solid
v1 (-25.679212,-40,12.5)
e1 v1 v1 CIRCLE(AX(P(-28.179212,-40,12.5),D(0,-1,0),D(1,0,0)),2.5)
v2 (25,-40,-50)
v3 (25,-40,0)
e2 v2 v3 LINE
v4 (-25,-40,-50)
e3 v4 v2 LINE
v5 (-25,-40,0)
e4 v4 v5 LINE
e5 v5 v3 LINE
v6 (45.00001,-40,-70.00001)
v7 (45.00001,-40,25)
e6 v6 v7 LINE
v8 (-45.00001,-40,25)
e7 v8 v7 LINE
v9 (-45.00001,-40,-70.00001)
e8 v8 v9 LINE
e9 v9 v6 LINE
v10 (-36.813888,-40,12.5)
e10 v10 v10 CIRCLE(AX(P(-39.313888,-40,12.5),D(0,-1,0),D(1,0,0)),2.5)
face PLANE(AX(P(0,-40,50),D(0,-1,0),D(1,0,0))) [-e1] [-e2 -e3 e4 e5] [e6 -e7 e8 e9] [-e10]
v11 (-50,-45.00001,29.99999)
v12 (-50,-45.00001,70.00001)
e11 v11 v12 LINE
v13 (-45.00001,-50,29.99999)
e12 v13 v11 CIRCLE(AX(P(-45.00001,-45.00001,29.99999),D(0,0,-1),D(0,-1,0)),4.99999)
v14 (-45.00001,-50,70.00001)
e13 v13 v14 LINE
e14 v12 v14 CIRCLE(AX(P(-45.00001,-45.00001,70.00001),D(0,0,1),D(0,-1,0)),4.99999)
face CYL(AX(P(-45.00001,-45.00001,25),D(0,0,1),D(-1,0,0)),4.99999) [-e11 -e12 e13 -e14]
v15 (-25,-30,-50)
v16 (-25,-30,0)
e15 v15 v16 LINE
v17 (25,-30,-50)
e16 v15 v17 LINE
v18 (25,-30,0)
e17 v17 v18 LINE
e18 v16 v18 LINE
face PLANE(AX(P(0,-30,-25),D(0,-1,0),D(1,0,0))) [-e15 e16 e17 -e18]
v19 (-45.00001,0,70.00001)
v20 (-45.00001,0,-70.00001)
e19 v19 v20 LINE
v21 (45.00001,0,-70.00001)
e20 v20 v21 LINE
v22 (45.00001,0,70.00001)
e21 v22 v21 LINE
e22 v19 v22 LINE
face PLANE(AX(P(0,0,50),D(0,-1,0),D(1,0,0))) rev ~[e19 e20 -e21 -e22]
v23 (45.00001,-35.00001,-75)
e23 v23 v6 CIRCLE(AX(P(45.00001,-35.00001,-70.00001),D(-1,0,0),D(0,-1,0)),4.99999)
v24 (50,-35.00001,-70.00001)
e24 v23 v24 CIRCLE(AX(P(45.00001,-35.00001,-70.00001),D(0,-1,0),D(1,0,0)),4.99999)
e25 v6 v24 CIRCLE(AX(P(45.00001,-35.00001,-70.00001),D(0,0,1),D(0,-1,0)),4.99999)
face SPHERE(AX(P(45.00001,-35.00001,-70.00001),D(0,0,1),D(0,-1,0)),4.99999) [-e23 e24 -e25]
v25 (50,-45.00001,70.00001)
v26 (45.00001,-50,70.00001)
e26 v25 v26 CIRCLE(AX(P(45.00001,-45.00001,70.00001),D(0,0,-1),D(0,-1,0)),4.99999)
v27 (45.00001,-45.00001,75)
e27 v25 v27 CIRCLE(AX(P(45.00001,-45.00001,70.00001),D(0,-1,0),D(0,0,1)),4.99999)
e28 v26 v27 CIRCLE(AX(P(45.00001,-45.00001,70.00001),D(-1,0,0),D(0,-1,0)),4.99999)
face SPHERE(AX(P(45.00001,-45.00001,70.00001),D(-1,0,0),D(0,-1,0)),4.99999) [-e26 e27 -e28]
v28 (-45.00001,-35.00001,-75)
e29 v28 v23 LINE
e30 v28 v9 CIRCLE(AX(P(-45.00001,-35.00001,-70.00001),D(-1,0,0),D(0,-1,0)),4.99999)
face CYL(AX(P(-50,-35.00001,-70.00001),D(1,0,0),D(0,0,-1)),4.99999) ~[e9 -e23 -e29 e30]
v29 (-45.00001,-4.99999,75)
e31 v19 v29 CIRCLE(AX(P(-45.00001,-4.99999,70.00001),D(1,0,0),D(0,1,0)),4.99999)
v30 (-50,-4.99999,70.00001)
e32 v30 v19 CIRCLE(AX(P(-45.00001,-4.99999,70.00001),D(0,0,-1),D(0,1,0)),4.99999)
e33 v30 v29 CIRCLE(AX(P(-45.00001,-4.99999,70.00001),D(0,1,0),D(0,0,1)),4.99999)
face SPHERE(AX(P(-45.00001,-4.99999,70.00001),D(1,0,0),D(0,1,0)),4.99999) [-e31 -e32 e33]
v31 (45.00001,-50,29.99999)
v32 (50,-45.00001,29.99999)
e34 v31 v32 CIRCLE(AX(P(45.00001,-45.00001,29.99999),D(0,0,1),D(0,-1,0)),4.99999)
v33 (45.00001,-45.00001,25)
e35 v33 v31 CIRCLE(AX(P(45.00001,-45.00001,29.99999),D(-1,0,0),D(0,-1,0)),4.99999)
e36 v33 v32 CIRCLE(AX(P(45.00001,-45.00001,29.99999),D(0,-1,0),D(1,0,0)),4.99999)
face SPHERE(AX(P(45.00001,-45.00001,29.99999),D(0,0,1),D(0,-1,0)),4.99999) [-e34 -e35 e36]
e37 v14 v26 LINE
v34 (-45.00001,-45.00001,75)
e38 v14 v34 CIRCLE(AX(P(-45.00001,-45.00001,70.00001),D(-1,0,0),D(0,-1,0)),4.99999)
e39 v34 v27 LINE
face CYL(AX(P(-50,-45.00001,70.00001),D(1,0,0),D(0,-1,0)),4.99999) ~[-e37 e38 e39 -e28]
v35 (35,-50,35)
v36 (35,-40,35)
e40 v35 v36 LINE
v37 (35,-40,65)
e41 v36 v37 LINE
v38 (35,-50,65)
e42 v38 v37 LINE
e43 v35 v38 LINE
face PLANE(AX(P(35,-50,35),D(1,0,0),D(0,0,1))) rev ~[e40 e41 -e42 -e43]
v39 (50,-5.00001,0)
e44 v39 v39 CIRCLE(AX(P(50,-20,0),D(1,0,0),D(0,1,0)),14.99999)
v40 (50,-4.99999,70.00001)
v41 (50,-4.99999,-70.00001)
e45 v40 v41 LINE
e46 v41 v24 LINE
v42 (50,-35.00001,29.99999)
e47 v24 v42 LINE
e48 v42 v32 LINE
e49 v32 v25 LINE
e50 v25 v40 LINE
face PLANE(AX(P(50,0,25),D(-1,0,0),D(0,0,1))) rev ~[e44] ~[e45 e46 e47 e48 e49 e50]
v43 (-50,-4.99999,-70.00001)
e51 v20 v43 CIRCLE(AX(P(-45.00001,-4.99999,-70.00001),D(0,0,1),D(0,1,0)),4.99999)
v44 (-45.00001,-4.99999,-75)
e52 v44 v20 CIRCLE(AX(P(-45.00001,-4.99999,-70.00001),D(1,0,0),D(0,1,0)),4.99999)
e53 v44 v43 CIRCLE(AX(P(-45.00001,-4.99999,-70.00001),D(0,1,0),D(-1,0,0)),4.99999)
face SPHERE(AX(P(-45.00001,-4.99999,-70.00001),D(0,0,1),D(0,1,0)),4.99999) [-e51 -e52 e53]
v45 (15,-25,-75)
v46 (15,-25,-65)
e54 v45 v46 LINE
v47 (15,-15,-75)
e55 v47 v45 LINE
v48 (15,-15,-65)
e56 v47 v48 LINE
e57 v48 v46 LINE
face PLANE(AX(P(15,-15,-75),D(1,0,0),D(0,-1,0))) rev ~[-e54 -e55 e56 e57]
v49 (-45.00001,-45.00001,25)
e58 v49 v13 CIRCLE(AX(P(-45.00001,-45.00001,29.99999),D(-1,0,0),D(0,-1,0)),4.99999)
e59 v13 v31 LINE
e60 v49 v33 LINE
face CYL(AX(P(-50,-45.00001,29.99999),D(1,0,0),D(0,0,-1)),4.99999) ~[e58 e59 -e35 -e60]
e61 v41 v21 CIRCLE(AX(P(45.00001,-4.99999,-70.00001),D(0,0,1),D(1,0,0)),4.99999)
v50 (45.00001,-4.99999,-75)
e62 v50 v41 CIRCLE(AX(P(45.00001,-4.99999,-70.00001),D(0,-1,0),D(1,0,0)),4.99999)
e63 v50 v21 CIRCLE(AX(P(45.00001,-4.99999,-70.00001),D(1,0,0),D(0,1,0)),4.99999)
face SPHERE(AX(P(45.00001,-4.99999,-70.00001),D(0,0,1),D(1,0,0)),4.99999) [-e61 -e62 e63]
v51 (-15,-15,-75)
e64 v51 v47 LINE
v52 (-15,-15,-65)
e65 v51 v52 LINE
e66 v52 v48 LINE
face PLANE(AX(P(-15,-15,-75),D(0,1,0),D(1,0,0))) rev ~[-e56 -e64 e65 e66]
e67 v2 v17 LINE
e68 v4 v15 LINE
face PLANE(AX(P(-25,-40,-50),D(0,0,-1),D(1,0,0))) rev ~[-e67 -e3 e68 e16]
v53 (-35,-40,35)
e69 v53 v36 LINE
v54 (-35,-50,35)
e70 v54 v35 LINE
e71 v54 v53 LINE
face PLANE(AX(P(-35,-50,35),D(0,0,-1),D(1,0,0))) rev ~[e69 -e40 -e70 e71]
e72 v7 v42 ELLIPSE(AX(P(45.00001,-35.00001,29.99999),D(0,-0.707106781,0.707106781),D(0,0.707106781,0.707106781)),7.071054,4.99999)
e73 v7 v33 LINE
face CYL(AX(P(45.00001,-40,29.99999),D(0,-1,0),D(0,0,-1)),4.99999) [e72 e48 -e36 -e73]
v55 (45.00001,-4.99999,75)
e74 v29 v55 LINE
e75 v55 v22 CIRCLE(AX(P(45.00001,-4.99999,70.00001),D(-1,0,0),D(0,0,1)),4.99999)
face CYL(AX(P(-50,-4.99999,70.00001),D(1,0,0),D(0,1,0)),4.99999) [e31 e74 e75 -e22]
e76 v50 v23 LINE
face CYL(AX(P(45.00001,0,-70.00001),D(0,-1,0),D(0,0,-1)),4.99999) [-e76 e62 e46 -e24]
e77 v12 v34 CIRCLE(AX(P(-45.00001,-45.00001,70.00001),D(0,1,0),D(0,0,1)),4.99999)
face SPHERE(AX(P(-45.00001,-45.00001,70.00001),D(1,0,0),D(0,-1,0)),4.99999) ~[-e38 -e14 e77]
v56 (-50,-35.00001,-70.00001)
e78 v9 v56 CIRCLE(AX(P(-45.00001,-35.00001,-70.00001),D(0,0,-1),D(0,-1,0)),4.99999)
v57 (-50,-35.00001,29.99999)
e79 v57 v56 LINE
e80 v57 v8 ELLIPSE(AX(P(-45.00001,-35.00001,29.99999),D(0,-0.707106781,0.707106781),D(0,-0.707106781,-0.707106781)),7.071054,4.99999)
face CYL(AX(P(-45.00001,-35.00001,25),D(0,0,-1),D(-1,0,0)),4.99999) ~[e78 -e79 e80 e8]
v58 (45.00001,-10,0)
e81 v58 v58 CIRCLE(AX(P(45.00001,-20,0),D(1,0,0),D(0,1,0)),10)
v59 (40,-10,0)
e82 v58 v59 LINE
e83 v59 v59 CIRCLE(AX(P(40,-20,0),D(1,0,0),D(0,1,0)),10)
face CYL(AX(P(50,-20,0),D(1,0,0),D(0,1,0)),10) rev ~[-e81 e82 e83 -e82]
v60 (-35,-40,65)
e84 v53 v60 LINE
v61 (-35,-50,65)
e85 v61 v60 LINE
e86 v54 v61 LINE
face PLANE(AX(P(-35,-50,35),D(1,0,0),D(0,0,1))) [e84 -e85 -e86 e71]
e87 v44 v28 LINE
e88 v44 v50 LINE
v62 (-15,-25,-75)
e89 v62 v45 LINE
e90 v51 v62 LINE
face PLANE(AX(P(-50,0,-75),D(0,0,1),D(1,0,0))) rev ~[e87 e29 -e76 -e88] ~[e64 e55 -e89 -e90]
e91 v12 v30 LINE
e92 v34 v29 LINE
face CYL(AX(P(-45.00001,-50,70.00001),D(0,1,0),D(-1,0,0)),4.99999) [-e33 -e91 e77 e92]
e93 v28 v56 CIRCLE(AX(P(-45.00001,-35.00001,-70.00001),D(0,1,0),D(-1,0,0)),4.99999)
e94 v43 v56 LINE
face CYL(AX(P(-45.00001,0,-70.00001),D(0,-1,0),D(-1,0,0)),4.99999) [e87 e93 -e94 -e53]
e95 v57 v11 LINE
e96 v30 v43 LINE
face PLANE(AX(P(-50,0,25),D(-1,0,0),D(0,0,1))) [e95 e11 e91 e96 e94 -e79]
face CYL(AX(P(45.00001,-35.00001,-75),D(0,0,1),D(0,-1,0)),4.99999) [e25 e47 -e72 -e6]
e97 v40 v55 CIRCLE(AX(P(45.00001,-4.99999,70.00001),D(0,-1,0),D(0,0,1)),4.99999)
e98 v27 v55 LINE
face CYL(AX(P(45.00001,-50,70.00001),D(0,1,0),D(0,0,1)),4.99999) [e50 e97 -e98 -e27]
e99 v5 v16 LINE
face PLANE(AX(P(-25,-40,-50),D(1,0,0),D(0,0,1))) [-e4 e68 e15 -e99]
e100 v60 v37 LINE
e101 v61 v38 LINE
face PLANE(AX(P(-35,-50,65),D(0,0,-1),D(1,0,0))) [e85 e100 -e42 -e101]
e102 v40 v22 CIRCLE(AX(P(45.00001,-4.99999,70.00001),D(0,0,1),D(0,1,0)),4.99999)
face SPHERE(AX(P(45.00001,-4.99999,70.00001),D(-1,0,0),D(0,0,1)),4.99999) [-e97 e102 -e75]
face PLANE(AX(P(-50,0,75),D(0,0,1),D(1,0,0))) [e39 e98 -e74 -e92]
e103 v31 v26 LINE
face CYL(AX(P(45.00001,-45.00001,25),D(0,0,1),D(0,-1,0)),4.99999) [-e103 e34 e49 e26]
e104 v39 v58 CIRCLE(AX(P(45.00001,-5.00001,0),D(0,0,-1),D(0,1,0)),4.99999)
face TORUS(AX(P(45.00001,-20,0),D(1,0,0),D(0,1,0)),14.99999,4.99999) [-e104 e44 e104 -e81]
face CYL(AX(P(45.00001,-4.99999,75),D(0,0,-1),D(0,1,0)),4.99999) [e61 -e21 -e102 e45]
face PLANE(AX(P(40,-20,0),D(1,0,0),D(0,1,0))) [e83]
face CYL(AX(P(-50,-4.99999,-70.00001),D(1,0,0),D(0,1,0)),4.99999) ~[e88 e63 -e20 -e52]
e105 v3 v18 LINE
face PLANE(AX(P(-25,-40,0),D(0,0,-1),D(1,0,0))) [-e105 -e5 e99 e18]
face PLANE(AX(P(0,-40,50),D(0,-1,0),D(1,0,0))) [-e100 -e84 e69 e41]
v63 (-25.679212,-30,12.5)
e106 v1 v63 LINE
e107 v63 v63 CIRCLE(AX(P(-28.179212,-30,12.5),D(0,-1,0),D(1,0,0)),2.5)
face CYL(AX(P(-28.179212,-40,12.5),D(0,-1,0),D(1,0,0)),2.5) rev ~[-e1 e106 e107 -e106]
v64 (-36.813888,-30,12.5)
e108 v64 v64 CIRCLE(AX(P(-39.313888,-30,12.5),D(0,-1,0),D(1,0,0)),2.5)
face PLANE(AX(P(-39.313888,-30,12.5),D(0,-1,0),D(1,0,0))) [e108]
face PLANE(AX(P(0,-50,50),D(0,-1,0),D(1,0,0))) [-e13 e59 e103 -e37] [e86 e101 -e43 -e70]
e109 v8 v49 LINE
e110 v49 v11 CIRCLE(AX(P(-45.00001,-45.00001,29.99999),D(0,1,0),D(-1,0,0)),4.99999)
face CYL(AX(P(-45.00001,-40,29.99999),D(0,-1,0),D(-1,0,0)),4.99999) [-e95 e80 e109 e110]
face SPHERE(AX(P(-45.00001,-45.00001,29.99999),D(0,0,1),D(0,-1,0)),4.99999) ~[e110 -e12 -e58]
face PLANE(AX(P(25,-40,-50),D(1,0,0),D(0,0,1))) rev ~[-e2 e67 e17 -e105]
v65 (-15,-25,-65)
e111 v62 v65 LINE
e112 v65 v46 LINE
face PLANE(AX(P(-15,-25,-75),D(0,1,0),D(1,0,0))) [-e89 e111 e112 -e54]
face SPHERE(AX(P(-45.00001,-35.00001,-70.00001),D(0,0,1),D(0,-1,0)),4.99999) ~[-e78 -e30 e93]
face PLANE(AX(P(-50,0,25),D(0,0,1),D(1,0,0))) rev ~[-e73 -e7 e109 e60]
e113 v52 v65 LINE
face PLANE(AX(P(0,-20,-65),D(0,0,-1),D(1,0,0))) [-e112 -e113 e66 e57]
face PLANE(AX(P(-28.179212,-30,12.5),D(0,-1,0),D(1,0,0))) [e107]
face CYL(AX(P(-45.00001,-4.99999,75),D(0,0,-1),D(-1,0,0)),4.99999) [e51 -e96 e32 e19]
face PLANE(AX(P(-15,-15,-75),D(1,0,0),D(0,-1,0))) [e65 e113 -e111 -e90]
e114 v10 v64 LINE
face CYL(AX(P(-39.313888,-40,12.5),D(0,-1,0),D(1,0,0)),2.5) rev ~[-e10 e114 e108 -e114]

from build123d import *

# Parameters (mm, degrees)
F0_W      = 100
F0_H      = 50
F1_DEPTH  = 50
F3_DEPTH  = 10
F0_H_2    = 100
F4_DEPTH  = 40
F5_R      = 10
F6_DEPTH  = 10
F7_W      = 70
F7_H      = 30
F8_DEPTH  = 10
F9_W      = 30
F9_H      = 10
F10_DEPTH = 10
F11_W     = 50
F11_H     = 50
F12_DEPTH = 10
F13_R     = 4.99999
F14_R     = 2.5
F15_DEPTH = 10


# Not quite as in the source:
# - a fillet or chamfer is up to 0.001 mm smaller than in the source, because OpenCascade refuses the exact size


with BuildPart() as f1:
    # F0 (on Front) → F1 (new body)
    with BuildSketch(Plane.XZ):
        with Locations((0, 50)):
            Rectangle(F0_W, F0_H)
    extrude(amount=F1_DEPTH)

    # F2 (on face) → F3 (cut)
    with BuildSketch(Plane.YZ.offset(50)):
        with BuildLine():
            Line((-35, 25), (-15, 25))
            ThreePointArc((-15, 25), (-25, 35), (-35, 25))
        make_face()
        with BuildLine():
            ThreePointArc((-35, 25), (-25, 15), (-15, 25))
            Line((-15, 25), (-35, 25))
        make_face()
    extrude(amount=-F3_DEPTH, mode=Mode.SUBTRACT)

    # F0 (on Front) → F4 (join)
    with BuildSketch(Plane.XZ):
        with Locations((0, 50)):
            Rectangle(F0_W, F0_H)
        with Locations((0, -25)):
            Rectangle(F0_W, F0_H_2)
    extrude(amount=F4_DEPTH)

    # F5 (on face) → F6 (cut)
    with BuildSketch(Plane.YZ.offset(50)):
        with Locations((-20, 0)):
            Circle(F5_R)
    extrude(amount=-F6_DEPTH, mode=Mode.SUBTRACT)

    # F7 (on face) → F8 (cut)
    with BuildSketch(Plane.XZ.offset(50)):
        with Locations((0, 50)):
            Rectangle(F7_W, F7_H)
    extrude(amount=-F8_DEPTH, mode=Mode.SUBTRACT)

    # F9 (on face) → F10 (cut)
    with BuildSketch(Plane(origin=(0, 0, -75), x_dir=(1, 0, 0), z_dir=(0, 0, -1))):
        with Locations((0, 20)):
            Rectangle(F9_W, F9_H)
    extrude(amount=-F10_DEPTH, mode=Mode.SUBTRACT)

    # F11 (on face) → F12 (cut)
    with BuildSketch(Plane.XZ.offset(40)):
        with Locations((0, -25)):
            Rectangle(F11_W, F11_H)
    extrude(amount=-F12_DEPTH, mode=Mode.SUBTRACT)

    # F13 (radius 5 in the source; OpenCascade refuses exactly that, so slightly less here)
    f13_edges = [f1.edges().sort_by_distance(p)[0] for p in [
        (0, -50, 75),
        (-50, -50, 50),
        (50, -50, 50),
        (0, -50, 25),
        (-50, -40, -25),
        (50, -40, -25),
        (0, -40, -75),
        (0, 0, 75),
        (-50, 0, 0),
        (50, -25, 75),
        (-50, -25, 75),
        (50, 0, 0),
        (50, -20, -75),
        (50, -45, 25),
        (50, -30, 0),
        (0, 0, -75),
        (-50, -20, -75),
        (-50, -45, 25),
    ]]
    fillet(f13_edges, radius=F13_R)

    # F14 (on face) → F15 (cut)
    with BuildSketch(Plane.XZ.offset(40)):
        with Locations((-39.3138879017, 12.5)):
            Circle(F14_R)
        with Locations((-28.179211659, 12.5)):
            Circle(F14_R)
    extrude(amount=-F15_DEPTH, mode=Mode.SUBTRACT)


solid = f1.part
